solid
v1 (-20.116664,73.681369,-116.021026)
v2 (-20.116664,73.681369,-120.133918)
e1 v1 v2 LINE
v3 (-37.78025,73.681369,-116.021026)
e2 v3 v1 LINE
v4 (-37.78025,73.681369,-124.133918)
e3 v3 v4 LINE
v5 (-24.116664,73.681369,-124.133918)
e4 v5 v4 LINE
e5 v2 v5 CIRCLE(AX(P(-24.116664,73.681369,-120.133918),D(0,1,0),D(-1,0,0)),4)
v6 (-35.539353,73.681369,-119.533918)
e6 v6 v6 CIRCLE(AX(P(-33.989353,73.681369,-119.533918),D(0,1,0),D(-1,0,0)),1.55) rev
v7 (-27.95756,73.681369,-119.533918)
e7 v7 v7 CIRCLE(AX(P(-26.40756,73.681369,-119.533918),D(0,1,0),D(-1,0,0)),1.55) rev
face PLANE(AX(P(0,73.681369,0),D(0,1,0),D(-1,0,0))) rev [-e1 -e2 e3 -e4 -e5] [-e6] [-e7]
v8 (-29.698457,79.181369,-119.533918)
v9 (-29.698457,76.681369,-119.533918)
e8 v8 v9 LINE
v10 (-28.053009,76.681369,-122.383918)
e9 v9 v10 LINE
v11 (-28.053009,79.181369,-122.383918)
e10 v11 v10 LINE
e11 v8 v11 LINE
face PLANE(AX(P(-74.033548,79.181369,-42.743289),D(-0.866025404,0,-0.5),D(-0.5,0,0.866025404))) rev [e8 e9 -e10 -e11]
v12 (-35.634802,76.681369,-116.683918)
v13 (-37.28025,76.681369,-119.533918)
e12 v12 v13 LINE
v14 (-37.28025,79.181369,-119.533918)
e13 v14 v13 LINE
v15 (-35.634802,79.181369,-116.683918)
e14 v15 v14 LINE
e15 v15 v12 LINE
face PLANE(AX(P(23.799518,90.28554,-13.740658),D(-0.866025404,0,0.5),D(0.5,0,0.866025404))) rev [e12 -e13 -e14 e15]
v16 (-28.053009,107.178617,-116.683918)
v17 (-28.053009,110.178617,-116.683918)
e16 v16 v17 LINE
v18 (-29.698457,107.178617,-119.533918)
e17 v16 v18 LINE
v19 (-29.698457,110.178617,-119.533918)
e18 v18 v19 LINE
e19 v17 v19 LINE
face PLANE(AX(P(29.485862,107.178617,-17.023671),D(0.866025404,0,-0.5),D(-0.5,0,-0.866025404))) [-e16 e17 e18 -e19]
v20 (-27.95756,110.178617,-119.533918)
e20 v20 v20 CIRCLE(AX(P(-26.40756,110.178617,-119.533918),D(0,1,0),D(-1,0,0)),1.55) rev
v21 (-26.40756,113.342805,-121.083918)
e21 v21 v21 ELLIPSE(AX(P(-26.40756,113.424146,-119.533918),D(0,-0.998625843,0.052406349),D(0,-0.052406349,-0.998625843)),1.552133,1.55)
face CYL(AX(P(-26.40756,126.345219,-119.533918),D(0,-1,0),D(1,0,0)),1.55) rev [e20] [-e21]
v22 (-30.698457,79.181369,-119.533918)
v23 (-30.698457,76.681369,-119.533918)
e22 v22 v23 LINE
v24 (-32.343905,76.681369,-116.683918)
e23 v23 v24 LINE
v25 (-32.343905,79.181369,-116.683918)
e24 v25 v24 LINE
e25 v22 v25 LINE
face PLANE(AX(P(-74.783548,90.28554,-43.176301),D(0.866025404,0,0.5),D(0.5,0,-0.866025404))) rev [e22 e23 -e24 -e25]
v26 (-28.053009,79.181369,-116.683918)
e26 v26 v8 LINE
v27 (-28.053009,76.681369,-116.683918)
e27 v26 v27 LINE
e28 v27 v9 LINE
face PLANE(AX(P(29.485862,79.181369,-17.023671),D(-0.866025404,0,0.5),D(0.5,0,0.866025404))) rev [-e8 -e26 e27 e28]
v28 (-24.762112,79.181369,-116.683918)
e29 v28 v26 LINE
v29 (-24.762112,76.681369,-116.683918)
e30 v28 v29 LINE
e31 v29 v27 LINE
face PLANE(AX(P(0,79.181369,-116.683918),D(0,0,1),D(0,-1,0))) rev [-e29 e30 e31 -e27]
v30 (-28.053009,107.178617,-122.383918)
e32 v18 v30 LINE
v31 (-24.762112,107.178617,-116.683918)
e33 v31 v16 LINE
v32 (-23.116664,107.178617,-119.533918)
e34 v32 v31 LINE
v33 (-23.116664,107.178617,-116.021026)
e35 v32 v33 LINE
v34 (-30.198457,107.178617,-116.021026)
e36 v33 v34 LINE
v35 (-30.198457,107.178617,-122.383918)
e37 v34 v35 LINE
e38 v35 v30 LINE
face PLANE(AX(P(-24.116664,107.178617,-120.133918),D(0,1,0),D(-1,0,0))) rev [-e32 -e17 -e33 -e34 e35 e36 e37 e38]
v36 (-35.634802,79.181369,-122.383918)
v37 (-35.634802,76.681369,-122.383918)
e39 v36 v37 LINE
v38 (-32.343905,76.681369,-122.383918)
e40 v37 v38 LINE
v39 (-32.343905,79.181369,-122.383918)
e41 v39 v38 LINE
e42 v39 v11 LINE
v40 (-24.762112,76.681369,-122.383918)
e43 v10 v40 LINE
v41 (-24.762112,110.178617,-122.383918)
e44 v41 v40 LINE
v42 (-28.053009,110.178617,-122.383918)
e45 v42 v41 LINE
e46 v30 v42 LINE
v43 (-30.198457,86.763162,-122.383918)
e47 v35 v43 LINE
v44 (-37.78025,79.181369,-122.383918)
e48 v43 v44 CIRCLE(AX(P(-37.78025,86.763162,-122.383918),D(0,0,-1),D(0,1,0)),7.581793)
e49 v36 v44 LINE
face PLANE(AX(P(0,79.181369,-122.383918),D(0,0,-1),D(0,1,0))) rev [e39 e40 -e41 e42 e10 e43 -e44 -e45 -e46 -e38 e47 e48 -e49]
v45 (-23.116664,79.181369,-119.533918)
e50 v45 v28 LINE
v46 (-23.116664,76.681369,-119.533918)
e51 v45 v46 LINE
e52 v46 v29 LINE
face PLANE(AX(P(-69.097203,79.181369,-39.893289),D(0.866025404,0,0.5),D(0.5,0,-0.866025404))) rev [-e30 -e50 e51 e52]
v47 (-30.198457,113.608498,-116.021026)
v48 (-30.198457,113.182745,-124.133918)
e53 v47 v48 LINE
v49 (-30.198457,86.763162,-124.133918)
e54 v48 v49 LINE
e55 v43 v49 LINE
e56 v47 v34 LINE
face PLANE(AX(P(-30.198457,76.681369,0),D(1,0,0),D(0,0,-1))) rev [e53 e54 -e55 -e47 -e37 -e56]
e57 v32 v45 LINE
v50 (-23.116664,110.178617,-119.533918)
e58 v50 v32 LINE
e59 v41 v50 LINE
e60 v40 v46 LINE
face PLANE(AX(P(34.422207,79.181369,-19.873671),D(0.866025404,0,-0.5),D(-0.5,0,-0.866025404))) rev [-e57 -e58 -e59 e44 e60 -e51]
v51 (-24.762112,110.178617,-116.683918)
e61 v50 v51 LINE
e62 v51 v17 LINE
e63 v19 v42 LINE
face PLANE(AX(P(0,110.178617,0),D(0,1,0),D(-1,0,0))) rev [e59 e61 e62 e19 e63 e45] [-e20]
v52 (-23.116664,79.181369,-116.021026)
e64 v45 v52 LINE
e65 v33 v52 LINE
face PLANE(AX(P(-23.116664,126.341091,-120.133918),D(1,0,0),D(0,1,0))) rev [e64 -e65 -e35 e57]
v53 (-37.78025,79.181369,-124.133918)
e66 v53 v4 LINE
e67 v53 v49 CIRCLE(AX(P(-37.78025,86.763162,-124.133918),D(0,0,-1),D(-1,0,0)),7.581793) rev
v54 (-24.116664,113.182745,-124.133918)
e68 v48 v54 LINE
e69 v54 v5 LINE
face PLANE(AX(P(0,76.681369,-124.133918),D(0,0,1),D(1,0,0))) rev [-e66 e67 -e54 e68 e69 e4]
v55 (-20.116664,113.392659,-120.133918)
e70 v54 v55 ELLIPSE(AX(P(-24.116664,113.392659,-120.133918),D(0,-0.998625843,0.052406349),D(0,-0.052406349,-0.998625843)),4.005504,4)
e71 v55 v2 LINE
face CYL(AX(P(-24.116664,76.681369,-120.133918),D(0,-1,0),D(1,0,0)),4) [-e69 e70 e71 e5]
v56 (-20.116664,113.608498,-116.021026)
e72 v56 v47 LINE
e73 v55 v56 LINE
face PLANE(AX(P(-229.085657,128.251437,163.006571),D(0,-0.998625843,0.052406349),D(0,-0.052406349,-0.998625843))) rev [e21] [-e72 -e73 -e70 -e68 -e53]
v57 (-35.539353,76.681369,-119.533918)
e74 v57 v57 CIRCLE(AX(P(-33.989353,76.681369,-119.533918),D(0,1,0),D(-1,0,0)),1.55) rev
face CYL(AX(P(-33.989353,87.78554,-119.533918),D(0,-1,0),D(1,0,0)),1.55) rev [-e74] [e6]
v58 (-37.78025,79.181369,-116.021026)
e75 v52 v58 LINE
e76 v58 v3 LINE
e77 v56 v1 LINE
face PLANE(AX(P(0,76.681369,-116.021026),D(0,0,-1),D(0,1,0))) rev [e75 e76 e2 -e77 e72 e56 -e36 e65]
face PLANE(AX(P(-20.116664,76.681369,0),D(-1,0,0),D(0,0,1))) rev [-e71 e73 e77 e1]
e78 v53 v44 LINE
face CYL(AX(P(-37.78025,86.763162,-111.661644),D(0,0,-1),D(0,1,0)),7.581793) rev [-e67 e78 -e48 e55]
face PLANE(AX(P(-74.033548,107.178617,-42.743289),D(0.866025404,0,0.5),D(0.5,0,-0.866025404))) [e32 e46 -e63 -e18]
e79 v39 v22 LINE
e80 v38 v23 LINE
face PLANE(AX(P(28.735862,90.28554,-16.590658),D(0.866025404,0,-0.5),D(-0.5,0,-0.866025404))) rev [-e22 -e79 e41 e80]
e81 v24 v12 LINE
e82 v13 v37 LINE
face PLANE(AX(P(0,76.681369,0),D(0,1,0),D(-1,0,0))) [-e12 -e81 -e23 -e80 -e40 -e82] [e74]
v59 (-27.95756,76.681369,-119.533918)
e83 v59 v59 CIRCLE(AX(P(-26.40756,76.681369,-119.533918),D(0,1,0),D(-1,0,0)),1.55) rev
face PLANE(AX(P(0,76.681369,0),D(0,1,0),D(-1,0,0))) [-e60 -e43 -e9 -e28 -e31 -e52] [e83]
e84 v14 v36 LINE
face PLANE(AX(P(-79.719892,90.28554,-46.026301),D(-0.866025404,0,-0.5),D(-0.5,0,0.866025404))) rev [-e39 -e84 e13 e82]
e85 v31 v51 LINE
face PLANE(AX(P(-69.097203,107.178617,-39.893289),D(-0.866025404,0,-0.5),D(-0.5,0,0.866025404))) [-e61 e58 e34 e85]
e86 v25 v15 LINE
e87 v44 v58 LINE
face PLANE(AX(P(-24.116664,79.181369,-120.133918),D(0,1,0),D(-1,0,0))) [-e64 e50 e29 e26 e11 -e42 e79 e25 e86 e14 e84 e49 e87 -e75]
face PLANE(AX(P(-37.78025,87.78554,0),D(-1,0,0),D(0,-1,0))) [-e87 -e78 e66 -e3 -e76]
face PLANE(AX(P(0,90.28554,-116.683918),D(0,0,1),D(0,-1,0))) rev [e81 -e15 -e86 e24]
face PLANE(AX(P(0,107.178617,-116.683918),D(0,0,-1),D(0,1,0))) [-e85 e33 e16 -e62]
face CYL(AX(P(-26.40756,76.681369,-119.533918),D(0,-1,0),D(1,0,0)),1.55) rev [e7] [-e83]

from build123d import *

# Parameters (mm, degrees)
SKETCH4_R                 = 1.55
BOSS_EXTRUDE4_DEPTH       = 3
BOSS_EXTRUDE5_START       = 3
BOSS_EXTRUDE5_DEPTH       = 2.5
BOSS_EXTRUDE6_START       = 5.5
BOSS_EXTRUDE6_DEPTH       = 31.423000022
BOSS_EXTRUDE6_START_2     = 116.532620121
BOSS_EXTRUDE6_2_OUTLINE_W = 13
BOSS_EXTRUDE6_2_OUTLINE_H = 11
BOSS_EXTRUDE6_2_DEPTH     = 1.467379879
BOSS_EXTRUDE7_START       = 36.497247904
BOSS_EXTRUDE7_OUTLINE_R   = 1.55
BOSS_EXTRUDE7_DEPTH       = 3.429880261
BOSS_EXTRUDE7_START_2     = 119.532620121
BOSS_EXTRUDE7_2_OUTLINE_W = 13
BOSS_EXTRUDE7_2_OUTLINE_H = 12
BOSS_EXTRUDE7_2_DEPTH     = 1.467379879
BOSS_EXTRUDE8_START       = 33.497248
BOSS_EXTRUDE8_DEPTH       = 3
SKETCH4_12_W              = 7.581793069
SKETCH4_12_H              = 8.112892266
SKETCH4_12_R              = 1.55
BOSS_EXTRUDE10_DEPTH      = 3
BOSS_EXTRUDE11_START      = 3
SKETCH4_13_W              = 7.581793069
SKETCH4_13_H              = 8.112892266
BOSS_EXTRUDE11_DEPTH      = 2.5
BOSS_EXTRUDE12_DEPTH      = 1.75


with BuildPart() as part:
    # Sketch4 → Boss-Extrude4 (new body)
    with BuildSketch(Plane(origin=(0, 73.681369419, 0), x_dir=(1, 0, 0), z_dir=(0, 1, 0))):
        with BuildLine():
            Line((-30.198456841, 124.133918355), (-24.116663772, 124.133918355))
            ThreePointArc((-24.116663772, 124.133918355), (-21.288236648, 122.96234548), (-20.116663772, 120.133918355))
            Line((-20.116663772, 120.133918355), (-20.116663772, 116.021026089))
            Line((-20.116663772, 116.021026089), (-30.198456841, 116.021026089))
            Line((-30.198456841, 116.021026089), (-30.198456841, 124.133918355))
        make_face()
        with Locations(Location((-26.407560307, 119.533918355, 0), (0, 0, 180))):
            Circle(SKETCH4_R, mode=Mode.SUBTRACT)
    extrude(amount=BOSS_EXTRUDE4_DEPTH)

    # Sketch4<5> → Boss-Extrude5 (add)
    with BuildSketch(Plane(origin=(0, 73.681369419, 0), x_dir=(1, 0, 0), z_dir=(0, 1, 0)).offset(BOSS_EXTRUDE5_START)):
        with BuildLine():
            Line((-24.116663772, 124.133918355), (-30.198456841, 124.133918355))
            Line((-30.198456841, 124.133918355), (-30.198456841, 122.383918355))
            Line((-30.198456841, 122.383918355), (-28.053008574, 122.383918355))
            Line((-28.053008574, 122.383918355), (-24.762112039, 122.383918355))
            Line((-24.762112039, 122.383918355), (-23.116663772, 119.533918355))
            Line((-23.116663772, 119.533918355), (-23.116663772, 116.021026089))
            Line((-23.116663772, 116.021026089), (-20.116663772, 116.021026089))
            Line((-20.116663772, 116.021026089), (-20.116663772, 120.133918355))
            ThreePointArc((-20.116663772, 120.133918355), (-21.288236648, 122.96234548), (-24.116663772, 124.133918355))
        make_face()
        Polygon((-28.053008574, 122.383918355), (-30.198456841, 122.383918355), (-30.198456841, 116.021026089), (-23.116663772, 116.021026089), (-23.116663772, 119.533918355), (-24.762112039, 116.683918355), (-28.053008574, 116.683918355), (-29.698456841, 119.533918355), align=None)
    extrude(amount=BOSS_EXTRUDE5_DEPTH)

    # Boss-Extrude6: read off the stored shape, not the designer's step
    # Boss-Extrude6 outline → Boss-Extrude6 (add)
    with BuildSketch(Plane(origin=(0, 73.681369419, 0), x_dir=(1, 0, 0), z_dir=(0, 1, 0)).offset(BOSS_EXTRUDE6_START)):
        with BuildLine():
            Line((-24.116663772, 124.133918355), (-30.198456841, 124.133918355))
            Line((-30.198456841, 124.133918355), (-30.198456841, 122.383918355))
            Line((-30.198456841, 122.383918355), (-24.762112039, 122.383918355))
            Line((-24.762112039, 122.383918355), (-23.116663772, 119.533918355))
            Line((-23.116663772, 119.533918355), (-23.116663772, 116.021026089))
            Line((-23.116663772, 116.021026089), (-20.116663772, 116.021026089))
            Line((-20.116663772, 116.021026089), (-20.116663772, 120.133918355))
            ThreePointArc((-20.116663772, 120.133918355), (-21.288236648, 122.96234548), (-24.116663772, 124.133918355))
        make_face()
    extrude(amount=BOSS_EXTRUDE6_DEPTH)

    # Boss-Extrude6 2 outline → Boss-Extrude6 2 (cut)
    with BuildSketch(Plane(origin=(0, 0, 0), x_dir=(1, 0, 0), z_dir=(0, 0.9986258431157963, -0.05240634943654381)).offset(BOSS_EXTRUDE6_START_2)):
        with Locations((-25.5, 114.5)):
            Rectangle(BOSS_EXTRUDE6_2_OUTLINE_W, BOSS_EXTRUDE6_2_OUTLINE_H)
    extrude(amount=BOSS_EXTRUDE6_2_DEPTH, mode=Mode.SUBTRACT)

    # Boss-Extrude7: read off the stored shape, not the designer's step
    # Boss-Extrude7 outline → Boss-Extrude7 (add)
    with BuildSketch(Plane(origin=(0, 73.681369419, 0), x_dir=(1, 0, 0), z_dir=(0, 1, 0)).offset(BOSS_EXTRUDE7_START)):
        with BuildLine():
            Line((-30.198456841, 116.021026089), (-20.116663772, 116.021026089))
            Line((-20.116663772, 116.021026089), (-20.116663772, 120.133918355))
            ThreePointArc((-20.116663772, 120.133918355), (-21.288236648, 122.96234548), (-24.116663772, 124.133918355))
            Line((-24.116663772, 124.133918355), (-30.198456841, 124.133918355))
            Line((-30.198456841, 124.133918355), (-30.198456841, 116.021026089))
        make_face()
        with Locations((-26.407560307, 119.533918355)):
            Circle(BOSS_EXTRUDE7_OUTLINE_R, mode=Mode.SUBTRACT)
    extrude(amount=BOSS_EXTRUDE7_DEPTH)

    # Boss-Extrude7 2 outline → Boss-Extrude7 2 (cut)
    with BuildSketch(Plane(origin=(0, 0, 0), x_dir=(1, 0, 0), z_dir=(0, 0.9986258431157963, -0.05240634943654381)).offset(BOSS_EXTRUDE7_START_2)):
        with Locations((-25.5, 114)):
            Rectangle(BOSS_EXTRUDE7_2_OUTLINE_W, BOSS_EXTRUDE7_2_OUTLINE_H)
    extrude(amount=BOSS_EXTRUDE7_2_DEPTH, mode=Mode.SUBTRACT)

    # Sketch4<10> → Boss-Extrude8 (add)
    with BuildSketch(Plane(origin=(0, 73.681369419, 0), x_dir=(1, 0, 0), z_dir=(0, 1, 0)).offset(BOSS_EXTRUDE8_START)):
        with BuildLine():
            Line((-24.116663772, 124.133918355), (-30.198456841, 124.133918355))
            Line((-30.198456841, 124.133918355), (-30.198456841, 122.383918355))
            Line((-30.198456841, 122.383918355), (-28.053008574, 122.383918355))
            Line((-28.053008574, 122.383918355), (-24.762112039, 122.383918355))
            Line((-24.762112039, 122.383918355), (-23.116663772, 119.533918355))
            Line((-23.116663772, 119.533918355), (-23.116663772, 116.021026089))
            Line((-23.116663772, 116.021026089), (-20.116663772, 116.021026089))
            Line((-20.116663772, 116.021026089), (-20.116663772, 120.133918355))
            ThreePointArc((-20.116663772, 120.133918355), (-21.288236648, 122.96234548), (-24.116663772, 124.133918355))
        make_face()
        Polygon((-28.053008574, 122.383918355), (-30.198456841, 122.383918355), (-30.198456841, 116.021026089), (-23.116663772, 116.021026089), (-23.116663772, 119.533918355), (-24.762112039, 116.683918355), (-28.053008574, 116.683918355), (-29.698456841, 119.533918355), align=None)
    extrude(amount=BOSS_EXTRUDE8_DEPTH)

    # Sketch4<12> → Boss-Extrude10 (add)
    # profile 1 of 2: a face of its own
    with BuildSketch(Plane(origin=(0, 73.681369419, 0), x_dir=(1, 0, 0), z_dir=(0, 1, 0))):
        with Locations((-33.989353376, 120.077472222)):
            Rectangle(SKETCH4_12_W, SKETCH4_12_H)
        Polygon((-32.343905108, 116.683918355), (-30.698456841, 119.533918355), (-32.343905108, 122.383918355), (-35.634801643, 122.383918355), (-37.28024991, 119.533918355), (-35.634801643, 116.683918355), align=None, mode=Mode.SUBTRACT)
    # profile 2 of 2: a face of its own
    with BuildSketch(Plane(origin=(0, 73.681369419, 0), x_dir=(1, 0, 0), z_dir=(0, 1, 0))):
        Polygon((-35.634801643, 116.683918355), (-32.343905108, 116.683918355), (-30.698456841, 119.533918355), (-32.343905108, 122.383918355), (-35.634801643, 122.383918355), (-37.28024991, 119.533918355), align=None)
        with Locations(Location((-33.989353375, 119.533918355, 0), (0, 0, 180))):
            Circle(SKETCH4_12_R, mode=Mode.SUBTRACT)
    extrude(amount=BOSS_EXTRUDE10_DEPTH)

    # Sketch4<13> → Boss-Extrude11 (add)
    with BuildSketch(Plane(origin=(0, 73.681369419, 0), x_dir=(1, 0, 0), z_dir=(0, 1, 0)).offset(BOSS_EXTRUDE11_START)):
        with Locations((-33.989353376, 120.077472222)):
            Rectangle(SKETCH4_13_W, SKETCH4_13_H)
        Polygon((-32.343905108, 116.683918355), (-30.698456841, 119.533918355), (-32.343905108, 122.383918355), (-35.634801643, 122.383918355), (-37.28024991, 119.533918355), (-35.634801643, 116.683918355), align=None, mode=Mode.SUBTRACT)
    extrude(amount=BOSS_EXTRUDE11_DEPTH)

    # Sketch7 → Boss-Extrude12 (add)
    with BuildSketch(Plane(origin=(0, 0, -124.133918355), x_dir=(-1, 0, 0), z_dir=(0, 0, -1))):
        with BuildLine():
            Line((30.198456841, 79.181369419), (37.78024991, 79.181369419))
            ThreePointArc((37.78024991, 79.181369419), (32.419112617, 81.402025196), (30.198456841, 86.763162488))
            Line((30.198456841, 86.763162488), (30.198456841, 79.181369419))
        make_face()
    extrude(amount=-BOSS_EXTRUDE12_DEPTH)


solid = part.part
